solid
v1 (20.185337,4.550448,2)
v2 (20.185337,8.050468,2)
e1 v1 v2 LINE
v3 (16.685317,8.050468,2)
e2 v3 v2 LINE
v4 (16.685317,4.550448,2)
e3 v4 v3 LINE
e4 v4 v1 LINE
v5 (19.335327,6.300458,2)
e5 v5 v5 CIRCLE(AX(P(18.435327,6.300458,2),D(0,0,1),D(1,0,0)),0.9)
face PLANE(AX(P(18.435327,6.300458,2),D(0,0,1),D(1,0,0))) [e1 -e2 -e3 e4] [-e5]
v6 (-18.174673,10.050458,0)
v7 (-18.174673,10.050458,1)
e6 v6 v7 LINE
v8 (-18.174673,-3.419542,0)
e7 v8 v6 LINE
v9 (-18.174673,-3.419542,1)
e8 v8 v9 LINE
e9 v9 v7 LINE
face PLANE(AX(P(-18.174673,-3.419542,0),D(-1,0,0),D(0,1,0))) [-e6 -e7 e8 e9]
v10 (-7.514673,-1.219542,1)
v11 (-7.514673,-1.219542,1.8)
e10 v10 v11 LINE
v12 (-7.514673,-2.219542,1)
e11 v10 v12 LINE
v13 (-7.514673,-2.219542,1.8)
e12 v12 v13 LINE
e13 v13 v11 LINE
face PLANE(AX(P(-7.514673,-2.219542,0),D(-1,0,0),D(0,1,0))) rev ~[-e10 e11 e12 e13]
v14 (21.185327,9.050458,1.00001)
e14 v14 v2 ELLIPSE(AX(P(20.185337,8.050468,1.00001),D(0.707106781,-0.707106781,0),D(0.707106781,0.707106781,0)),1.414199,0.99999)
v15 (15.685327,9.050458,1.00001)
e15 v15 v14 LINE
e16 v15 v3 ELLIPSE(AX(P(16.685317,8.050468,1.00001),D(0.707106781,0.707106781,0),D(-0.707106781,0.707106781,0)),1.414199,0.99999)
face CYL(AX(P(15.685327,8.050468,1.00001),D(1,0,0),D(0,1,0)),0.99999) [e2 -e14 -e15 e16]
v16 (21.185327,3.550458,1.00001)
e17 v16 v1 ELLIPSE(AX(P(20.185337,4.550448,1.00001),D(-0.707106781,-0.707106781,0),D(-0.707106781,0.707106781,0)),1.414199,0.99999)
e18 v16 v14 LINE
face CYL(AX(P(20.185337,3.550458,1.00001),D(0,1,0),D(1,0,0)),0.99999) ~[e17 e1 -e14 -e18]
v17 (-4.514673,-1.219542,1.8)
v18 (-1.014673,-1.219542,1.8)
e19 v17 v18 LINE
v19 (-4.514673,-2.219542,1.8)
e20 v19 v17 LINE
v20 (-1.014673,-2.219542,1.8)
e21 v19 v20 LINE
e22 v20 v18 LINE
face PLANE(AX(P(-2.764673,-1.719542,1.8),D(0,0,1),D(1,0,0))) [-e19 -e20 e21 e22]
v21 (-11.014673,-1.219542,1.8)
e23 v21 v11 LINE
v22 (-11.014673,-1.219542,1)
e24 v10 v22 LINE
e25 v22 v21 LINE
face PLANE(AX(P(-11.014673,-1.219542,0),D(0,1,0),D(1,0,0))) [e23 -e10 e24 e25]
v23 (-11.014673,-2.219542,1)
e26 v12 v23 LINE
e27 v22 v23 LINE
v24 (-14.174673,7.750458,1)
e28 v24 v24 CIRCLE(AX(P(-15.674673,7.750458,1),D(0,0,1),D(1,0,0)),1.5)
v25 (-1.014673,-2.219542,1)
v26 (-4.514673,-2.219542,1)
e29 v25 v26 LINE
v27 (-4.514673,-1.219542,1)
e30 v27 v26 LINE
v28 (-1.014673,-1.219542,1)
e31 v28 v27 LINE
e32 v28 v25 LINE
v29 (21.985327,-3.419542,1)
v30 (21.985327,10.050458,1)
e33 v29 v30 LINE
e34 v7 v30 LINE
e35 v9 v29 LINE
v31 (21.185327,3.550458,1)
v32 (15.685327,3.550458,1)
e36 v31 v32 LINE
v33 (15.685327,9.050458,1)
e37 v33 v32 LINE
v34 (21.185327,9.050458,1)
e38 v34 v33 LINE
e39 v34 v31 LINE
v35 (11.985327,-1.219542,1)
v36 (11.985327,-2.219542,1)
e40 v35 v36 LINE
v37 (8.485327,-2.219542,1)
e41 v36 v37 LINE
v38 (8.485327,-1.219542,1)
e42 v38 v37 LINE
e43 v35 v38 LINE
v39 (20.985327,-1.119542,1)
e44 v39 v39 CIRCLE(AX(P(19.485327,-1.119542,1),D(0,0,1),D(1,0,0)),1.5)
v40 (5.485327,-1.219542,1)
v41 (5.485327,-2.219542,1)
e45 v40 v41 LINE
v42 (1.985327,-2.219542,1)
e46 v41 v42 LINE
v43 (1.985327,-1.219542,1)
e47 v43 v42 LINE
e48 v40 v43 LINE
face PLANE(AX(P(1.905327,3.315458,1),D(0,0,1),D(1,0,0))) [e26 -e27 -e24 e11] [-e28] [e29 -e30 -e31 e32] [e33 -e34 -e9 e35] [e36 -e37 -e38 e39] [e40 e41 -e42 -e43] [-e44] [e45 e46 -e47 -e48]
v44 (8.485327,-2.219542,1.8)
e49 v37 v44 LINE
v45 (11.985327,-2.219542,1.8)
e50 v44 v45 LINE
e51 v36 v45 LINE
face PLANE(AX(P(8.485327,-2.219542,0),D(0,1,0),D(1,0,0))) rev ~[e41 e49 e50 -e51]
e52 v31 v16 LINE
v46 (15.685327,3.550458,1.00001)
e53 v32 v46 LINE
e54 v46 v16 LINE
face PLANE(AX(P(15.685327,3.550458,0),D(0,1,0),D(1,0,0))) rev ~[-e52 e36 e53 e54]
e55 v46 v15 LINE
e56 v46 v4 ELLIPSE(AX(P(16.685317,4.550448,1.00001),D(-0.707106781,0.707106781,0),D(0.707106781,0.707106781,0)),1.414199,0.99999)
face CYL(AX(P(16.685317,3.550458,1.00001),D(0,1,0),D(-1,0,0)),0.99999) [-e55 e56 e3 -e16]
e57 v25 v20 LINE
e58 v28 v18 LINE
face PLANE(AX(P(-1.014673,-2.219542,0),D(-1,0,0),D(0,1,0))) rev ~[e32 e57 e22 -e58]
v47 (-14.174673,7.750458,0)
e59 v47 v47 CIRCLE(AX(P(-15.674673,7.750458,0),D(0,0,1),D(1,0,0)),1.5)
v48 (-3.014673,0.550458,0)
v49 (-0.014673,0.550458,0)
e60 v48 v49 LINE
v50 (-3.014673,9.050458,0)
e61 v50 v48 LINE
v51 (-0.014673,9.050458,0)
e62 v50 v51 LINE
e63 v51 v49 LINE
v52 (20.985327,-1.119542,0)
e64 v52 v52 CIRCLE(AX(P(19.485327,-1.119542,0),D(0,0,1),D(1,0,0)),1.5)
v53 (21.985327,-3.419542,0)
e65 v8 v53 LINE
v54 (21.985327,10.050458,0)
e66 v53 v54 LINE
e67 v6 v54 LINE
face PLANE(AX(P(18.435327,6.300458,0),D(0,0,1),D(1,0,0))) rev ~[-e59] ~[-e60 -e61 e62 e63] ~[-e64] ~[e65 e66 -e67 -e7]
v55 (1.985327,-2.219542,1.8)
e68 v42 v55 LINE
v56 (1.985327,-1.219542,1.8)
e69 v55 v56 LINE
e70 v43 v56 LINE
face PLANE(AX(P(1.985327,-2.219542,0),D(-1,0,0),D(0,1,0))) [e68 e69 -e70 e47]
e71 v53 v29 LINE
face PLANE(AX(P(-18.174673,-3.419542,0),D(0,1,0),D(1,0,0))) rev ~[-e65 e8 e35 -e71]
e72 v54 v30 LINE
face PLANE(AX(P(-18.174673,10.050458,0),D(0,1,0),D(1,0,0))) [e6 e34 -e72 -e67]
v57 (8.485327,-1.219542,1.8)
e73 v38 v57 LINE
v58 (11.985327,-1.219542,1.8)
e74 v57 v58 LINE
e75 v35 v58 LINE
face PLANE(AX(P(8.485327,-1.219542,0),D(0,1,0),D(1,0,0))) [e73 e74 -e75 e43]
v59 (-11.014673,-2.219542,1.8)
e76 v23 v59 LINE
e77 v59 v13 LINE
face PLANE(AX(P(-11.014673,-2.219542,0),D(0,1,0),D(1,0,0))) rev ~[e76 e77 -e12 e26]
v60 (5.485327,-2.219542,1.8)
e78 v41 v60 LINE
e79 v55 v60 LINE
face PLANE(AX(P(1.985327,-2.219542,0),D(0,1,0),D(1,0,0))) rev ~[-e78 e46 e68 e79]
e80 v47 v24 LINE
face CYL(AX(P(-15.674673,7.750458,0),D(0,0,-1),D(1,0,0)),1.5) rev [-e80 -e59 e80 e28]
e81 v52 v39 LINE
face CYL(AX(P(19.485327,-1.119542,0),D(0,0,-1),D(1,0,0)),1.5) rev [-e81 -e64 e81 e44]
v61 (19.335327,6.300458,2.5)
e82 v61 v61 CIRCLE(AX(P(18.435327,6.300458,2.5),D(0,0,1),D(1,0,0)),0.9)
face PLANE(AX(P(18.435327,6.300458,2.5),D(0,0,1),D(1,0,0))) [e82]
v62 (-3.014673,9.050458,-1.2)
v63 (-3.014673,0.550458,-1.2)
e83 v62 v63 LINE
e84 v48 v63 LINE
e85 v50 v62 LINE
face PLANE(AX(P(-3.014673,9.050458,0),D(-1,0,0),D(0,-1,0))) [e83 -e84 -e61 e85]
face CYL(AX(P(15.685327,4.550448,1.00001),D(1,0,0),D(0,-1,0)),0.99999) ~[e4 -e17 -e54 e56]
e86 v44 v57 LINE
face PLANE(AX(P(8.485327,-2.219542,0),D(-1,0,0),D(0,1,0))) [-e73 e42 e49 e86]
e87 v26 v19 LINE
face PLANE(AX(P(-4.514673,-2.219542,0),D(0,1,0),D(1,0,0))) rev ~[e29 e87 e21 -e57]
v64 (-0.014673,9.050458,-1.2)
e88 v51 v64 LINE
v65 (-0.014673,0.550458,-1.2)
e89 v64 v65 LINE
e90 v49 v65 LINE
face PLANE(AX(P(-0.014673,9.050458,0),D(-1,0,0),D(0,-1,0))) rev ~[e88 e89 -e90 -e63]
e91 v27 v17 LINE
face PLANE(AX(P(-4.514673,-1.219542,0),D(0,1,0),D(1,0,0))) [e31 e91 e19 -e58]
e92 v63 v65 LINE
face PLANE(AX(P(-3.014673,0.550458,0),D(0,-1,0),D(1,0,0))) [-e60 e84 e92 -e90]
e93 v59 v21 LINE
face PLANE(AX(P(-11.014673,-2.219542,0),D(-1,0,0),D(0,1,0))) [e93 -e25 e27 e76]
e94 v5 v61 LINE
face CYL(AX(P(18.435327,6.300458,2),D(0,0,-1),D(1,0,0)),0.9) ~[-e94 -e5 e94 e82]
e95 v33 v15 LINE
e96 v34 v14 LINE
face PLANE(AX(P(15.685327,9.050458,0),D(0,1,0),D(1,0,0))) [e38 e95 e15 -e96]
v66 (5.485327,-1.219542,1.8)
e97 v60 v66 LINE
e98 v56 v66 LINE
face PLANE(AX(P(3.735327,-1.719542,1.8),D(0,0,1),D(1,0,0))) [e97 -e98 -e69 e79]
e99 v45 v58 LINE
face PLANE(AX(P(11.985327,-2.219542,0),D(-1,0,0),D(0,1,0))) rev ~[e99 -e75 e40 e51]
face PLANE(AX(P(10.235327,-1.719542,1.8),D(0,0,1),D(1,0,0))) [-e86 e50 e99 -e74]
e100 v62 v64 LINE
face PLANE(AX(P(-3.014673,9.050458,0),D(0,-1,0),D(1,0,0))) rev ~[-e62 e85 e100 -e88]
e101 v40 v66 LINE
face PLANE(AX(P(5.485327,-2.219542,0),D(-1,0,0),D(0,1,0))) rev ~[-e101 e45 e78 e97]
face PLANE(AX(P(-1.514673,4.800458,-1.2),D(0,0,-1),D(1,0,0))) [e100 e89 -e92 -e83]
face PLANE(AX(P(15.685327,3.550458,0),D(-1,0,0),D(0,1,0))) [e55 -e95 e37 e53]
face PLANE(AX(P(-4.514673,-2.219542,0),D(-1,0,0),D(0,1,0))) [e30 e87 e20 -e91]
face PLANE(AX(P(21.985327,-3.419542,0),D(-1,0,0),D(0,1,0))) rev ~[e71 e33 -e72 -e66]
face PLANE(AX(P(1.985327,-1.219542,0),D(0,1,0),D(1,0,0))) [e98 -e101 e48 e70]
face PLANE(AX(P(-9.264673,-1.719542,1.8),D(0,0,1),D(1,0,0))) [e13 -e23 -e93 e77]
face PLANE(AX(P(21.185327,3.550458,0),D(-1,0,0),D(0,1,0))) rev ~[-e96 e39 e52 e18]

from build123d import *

# Parameters (mm, degrees)
F0_W     = 40.16
F0_H     = 13.47
F0_W_2   = 3.5
F0_H_2   = 1
F0_R     = 1.5
F0_W_3   = 5.5
F0_H_3   = 5.5
F1_DEPTH = 1
F2_DEPTH = 1.8
F3_DEPTH = 2
F4_R     = 0.99999
F5_R     = 0.9
F6_DEPTH = 0.5
F7_W     = 3
F7_H     = 8.5
F8_DEPTH = 1.2


# Not quite as in the source:
# - a fillet or chamfer is up to 0.001 mm smaller than in the source, because OpenCascade refuses the exact size


with BuildPart() as f1:
    # F0 (on Top) → F1 (new body)
    with BuildSketch(Plane.XY):
        with Locations((1.9053274065, 3.3154582972)):
            Rectangle(F0_W, F0_H)
        with Locations((-9.2646725935, -1.7195417028)):
            Rectangle(F0_W_2, F0_H_2, mode=Mode.SUBTRACT)
        with Locations((-2.7646725935, -1.7195417028)):
            Rectangle(F0_W_2, F0_H_2, mode=Mode.SUBTRACT)
        with Locations((3.7353274065, -1.7195417028)):
            Rectangle(F0_W_2, F0_H_2, mode=Mode.SUBTRACT)
        with Locations((10.2353274065, -1.7195417028)):
            Rectangle(F0_W_2, F0_H_2, mode=Mode.SUBTRACT)
        with Locations((19.4853274065, -1.1195417028)):
            Circle(F0_R, mode=Mode.SUBTRACT)
        with Locations((-15.6746725935, 7.7504582972)):
            Circle(F0_R, mode=Mode.SUBTRACT)
        with Locations((18.4353274065, 6.3004582972)):
            Rectangle(F0_W_3, F0_H_3, mode=Mode.SUBTRACT)
        with Locations((-9.2646725935, -1.7195417028)):
            Rectangle(F0_W_2, F0_H_2)
        with Locations((-2.7646725935, -1.7195417028)):
            Rectangle(F0_W_2, F0_H_2)
        with Locations((3.7353274065, -1.7195417028)):
            Rectangle(F0_W_2, F0_H_2)
        with Locations((10.2353274065, -1.7195417028)):
            Rectangle(F0_W_2, F0_H_2)
        with Locations((18.4353274065, 6.3004582972)):
            Rectangle(F0_W_3, F0_H_3)
    extrude(amount=F1_DEPTH)

    # F0 (on Top) → F2 (join)
    with BuildSketch(Plane.XY):
        with Locations((-9.2646725935, -1.7195417028)):
            Rectangle(F0_W_2, F0_H_2)
        with Locations((-2.7646725935, -1.7195417028)):
            Rectangle(F0_W_2, F0_H_2)
        with Locations((3.7353274065, -1.7195417028)):
            Rectangle(F0_W_2, F0_H_2)
        with Locations((10.2353274065, -1.7195417028)):
            Rectangle(F0_W_2, F0_H_2)
    extrude(amount=F2_DEPTH)

    # F0 (on Top) → F3 (join)
    with BuildSketch(Plane.XY):
        with Locations((18.4353274065, 6.3004582972)):
            Rectangle(F0_W_3, F0_H_3)
    extrude(amount=F3_DEPTH)

    # F4 (radius 1 in the source; OpenCascade refuses exactly that, so slightly less here)
    f4_edges = [f1.edges().sort_by_distance(p)[0] for p in [
        (21.185327, 6.300458, 2),
        (15.685327, 6.300458, 2),
        (18.435327, 3.550458, 2),
        (18.435327, 9.050458, 2),
    ]]
    fillet(f4_edges, radius=F4_R)

    # F5 (on face) → F6 (join)
    with BuildSketch(Plane.XY.offset(2)):
        with Locations((18.4353274065, 6.3004582972)):
            Circle(F5_R)
    extrude(amount=F6_DEPTH)

    # F7 (on face) → F8 (join)
    with BuildSketch(Plane(origin=(0, 0, 0), x_dir=(1, 0, 0), z_dir=(0, 0, -1))):
        with Locations((-1.5146725935, -4.8004582972)):
            Rectangle(F7_W, F7_H)
    extrude(amount=F8_DEPTH)


solid = f1.part
